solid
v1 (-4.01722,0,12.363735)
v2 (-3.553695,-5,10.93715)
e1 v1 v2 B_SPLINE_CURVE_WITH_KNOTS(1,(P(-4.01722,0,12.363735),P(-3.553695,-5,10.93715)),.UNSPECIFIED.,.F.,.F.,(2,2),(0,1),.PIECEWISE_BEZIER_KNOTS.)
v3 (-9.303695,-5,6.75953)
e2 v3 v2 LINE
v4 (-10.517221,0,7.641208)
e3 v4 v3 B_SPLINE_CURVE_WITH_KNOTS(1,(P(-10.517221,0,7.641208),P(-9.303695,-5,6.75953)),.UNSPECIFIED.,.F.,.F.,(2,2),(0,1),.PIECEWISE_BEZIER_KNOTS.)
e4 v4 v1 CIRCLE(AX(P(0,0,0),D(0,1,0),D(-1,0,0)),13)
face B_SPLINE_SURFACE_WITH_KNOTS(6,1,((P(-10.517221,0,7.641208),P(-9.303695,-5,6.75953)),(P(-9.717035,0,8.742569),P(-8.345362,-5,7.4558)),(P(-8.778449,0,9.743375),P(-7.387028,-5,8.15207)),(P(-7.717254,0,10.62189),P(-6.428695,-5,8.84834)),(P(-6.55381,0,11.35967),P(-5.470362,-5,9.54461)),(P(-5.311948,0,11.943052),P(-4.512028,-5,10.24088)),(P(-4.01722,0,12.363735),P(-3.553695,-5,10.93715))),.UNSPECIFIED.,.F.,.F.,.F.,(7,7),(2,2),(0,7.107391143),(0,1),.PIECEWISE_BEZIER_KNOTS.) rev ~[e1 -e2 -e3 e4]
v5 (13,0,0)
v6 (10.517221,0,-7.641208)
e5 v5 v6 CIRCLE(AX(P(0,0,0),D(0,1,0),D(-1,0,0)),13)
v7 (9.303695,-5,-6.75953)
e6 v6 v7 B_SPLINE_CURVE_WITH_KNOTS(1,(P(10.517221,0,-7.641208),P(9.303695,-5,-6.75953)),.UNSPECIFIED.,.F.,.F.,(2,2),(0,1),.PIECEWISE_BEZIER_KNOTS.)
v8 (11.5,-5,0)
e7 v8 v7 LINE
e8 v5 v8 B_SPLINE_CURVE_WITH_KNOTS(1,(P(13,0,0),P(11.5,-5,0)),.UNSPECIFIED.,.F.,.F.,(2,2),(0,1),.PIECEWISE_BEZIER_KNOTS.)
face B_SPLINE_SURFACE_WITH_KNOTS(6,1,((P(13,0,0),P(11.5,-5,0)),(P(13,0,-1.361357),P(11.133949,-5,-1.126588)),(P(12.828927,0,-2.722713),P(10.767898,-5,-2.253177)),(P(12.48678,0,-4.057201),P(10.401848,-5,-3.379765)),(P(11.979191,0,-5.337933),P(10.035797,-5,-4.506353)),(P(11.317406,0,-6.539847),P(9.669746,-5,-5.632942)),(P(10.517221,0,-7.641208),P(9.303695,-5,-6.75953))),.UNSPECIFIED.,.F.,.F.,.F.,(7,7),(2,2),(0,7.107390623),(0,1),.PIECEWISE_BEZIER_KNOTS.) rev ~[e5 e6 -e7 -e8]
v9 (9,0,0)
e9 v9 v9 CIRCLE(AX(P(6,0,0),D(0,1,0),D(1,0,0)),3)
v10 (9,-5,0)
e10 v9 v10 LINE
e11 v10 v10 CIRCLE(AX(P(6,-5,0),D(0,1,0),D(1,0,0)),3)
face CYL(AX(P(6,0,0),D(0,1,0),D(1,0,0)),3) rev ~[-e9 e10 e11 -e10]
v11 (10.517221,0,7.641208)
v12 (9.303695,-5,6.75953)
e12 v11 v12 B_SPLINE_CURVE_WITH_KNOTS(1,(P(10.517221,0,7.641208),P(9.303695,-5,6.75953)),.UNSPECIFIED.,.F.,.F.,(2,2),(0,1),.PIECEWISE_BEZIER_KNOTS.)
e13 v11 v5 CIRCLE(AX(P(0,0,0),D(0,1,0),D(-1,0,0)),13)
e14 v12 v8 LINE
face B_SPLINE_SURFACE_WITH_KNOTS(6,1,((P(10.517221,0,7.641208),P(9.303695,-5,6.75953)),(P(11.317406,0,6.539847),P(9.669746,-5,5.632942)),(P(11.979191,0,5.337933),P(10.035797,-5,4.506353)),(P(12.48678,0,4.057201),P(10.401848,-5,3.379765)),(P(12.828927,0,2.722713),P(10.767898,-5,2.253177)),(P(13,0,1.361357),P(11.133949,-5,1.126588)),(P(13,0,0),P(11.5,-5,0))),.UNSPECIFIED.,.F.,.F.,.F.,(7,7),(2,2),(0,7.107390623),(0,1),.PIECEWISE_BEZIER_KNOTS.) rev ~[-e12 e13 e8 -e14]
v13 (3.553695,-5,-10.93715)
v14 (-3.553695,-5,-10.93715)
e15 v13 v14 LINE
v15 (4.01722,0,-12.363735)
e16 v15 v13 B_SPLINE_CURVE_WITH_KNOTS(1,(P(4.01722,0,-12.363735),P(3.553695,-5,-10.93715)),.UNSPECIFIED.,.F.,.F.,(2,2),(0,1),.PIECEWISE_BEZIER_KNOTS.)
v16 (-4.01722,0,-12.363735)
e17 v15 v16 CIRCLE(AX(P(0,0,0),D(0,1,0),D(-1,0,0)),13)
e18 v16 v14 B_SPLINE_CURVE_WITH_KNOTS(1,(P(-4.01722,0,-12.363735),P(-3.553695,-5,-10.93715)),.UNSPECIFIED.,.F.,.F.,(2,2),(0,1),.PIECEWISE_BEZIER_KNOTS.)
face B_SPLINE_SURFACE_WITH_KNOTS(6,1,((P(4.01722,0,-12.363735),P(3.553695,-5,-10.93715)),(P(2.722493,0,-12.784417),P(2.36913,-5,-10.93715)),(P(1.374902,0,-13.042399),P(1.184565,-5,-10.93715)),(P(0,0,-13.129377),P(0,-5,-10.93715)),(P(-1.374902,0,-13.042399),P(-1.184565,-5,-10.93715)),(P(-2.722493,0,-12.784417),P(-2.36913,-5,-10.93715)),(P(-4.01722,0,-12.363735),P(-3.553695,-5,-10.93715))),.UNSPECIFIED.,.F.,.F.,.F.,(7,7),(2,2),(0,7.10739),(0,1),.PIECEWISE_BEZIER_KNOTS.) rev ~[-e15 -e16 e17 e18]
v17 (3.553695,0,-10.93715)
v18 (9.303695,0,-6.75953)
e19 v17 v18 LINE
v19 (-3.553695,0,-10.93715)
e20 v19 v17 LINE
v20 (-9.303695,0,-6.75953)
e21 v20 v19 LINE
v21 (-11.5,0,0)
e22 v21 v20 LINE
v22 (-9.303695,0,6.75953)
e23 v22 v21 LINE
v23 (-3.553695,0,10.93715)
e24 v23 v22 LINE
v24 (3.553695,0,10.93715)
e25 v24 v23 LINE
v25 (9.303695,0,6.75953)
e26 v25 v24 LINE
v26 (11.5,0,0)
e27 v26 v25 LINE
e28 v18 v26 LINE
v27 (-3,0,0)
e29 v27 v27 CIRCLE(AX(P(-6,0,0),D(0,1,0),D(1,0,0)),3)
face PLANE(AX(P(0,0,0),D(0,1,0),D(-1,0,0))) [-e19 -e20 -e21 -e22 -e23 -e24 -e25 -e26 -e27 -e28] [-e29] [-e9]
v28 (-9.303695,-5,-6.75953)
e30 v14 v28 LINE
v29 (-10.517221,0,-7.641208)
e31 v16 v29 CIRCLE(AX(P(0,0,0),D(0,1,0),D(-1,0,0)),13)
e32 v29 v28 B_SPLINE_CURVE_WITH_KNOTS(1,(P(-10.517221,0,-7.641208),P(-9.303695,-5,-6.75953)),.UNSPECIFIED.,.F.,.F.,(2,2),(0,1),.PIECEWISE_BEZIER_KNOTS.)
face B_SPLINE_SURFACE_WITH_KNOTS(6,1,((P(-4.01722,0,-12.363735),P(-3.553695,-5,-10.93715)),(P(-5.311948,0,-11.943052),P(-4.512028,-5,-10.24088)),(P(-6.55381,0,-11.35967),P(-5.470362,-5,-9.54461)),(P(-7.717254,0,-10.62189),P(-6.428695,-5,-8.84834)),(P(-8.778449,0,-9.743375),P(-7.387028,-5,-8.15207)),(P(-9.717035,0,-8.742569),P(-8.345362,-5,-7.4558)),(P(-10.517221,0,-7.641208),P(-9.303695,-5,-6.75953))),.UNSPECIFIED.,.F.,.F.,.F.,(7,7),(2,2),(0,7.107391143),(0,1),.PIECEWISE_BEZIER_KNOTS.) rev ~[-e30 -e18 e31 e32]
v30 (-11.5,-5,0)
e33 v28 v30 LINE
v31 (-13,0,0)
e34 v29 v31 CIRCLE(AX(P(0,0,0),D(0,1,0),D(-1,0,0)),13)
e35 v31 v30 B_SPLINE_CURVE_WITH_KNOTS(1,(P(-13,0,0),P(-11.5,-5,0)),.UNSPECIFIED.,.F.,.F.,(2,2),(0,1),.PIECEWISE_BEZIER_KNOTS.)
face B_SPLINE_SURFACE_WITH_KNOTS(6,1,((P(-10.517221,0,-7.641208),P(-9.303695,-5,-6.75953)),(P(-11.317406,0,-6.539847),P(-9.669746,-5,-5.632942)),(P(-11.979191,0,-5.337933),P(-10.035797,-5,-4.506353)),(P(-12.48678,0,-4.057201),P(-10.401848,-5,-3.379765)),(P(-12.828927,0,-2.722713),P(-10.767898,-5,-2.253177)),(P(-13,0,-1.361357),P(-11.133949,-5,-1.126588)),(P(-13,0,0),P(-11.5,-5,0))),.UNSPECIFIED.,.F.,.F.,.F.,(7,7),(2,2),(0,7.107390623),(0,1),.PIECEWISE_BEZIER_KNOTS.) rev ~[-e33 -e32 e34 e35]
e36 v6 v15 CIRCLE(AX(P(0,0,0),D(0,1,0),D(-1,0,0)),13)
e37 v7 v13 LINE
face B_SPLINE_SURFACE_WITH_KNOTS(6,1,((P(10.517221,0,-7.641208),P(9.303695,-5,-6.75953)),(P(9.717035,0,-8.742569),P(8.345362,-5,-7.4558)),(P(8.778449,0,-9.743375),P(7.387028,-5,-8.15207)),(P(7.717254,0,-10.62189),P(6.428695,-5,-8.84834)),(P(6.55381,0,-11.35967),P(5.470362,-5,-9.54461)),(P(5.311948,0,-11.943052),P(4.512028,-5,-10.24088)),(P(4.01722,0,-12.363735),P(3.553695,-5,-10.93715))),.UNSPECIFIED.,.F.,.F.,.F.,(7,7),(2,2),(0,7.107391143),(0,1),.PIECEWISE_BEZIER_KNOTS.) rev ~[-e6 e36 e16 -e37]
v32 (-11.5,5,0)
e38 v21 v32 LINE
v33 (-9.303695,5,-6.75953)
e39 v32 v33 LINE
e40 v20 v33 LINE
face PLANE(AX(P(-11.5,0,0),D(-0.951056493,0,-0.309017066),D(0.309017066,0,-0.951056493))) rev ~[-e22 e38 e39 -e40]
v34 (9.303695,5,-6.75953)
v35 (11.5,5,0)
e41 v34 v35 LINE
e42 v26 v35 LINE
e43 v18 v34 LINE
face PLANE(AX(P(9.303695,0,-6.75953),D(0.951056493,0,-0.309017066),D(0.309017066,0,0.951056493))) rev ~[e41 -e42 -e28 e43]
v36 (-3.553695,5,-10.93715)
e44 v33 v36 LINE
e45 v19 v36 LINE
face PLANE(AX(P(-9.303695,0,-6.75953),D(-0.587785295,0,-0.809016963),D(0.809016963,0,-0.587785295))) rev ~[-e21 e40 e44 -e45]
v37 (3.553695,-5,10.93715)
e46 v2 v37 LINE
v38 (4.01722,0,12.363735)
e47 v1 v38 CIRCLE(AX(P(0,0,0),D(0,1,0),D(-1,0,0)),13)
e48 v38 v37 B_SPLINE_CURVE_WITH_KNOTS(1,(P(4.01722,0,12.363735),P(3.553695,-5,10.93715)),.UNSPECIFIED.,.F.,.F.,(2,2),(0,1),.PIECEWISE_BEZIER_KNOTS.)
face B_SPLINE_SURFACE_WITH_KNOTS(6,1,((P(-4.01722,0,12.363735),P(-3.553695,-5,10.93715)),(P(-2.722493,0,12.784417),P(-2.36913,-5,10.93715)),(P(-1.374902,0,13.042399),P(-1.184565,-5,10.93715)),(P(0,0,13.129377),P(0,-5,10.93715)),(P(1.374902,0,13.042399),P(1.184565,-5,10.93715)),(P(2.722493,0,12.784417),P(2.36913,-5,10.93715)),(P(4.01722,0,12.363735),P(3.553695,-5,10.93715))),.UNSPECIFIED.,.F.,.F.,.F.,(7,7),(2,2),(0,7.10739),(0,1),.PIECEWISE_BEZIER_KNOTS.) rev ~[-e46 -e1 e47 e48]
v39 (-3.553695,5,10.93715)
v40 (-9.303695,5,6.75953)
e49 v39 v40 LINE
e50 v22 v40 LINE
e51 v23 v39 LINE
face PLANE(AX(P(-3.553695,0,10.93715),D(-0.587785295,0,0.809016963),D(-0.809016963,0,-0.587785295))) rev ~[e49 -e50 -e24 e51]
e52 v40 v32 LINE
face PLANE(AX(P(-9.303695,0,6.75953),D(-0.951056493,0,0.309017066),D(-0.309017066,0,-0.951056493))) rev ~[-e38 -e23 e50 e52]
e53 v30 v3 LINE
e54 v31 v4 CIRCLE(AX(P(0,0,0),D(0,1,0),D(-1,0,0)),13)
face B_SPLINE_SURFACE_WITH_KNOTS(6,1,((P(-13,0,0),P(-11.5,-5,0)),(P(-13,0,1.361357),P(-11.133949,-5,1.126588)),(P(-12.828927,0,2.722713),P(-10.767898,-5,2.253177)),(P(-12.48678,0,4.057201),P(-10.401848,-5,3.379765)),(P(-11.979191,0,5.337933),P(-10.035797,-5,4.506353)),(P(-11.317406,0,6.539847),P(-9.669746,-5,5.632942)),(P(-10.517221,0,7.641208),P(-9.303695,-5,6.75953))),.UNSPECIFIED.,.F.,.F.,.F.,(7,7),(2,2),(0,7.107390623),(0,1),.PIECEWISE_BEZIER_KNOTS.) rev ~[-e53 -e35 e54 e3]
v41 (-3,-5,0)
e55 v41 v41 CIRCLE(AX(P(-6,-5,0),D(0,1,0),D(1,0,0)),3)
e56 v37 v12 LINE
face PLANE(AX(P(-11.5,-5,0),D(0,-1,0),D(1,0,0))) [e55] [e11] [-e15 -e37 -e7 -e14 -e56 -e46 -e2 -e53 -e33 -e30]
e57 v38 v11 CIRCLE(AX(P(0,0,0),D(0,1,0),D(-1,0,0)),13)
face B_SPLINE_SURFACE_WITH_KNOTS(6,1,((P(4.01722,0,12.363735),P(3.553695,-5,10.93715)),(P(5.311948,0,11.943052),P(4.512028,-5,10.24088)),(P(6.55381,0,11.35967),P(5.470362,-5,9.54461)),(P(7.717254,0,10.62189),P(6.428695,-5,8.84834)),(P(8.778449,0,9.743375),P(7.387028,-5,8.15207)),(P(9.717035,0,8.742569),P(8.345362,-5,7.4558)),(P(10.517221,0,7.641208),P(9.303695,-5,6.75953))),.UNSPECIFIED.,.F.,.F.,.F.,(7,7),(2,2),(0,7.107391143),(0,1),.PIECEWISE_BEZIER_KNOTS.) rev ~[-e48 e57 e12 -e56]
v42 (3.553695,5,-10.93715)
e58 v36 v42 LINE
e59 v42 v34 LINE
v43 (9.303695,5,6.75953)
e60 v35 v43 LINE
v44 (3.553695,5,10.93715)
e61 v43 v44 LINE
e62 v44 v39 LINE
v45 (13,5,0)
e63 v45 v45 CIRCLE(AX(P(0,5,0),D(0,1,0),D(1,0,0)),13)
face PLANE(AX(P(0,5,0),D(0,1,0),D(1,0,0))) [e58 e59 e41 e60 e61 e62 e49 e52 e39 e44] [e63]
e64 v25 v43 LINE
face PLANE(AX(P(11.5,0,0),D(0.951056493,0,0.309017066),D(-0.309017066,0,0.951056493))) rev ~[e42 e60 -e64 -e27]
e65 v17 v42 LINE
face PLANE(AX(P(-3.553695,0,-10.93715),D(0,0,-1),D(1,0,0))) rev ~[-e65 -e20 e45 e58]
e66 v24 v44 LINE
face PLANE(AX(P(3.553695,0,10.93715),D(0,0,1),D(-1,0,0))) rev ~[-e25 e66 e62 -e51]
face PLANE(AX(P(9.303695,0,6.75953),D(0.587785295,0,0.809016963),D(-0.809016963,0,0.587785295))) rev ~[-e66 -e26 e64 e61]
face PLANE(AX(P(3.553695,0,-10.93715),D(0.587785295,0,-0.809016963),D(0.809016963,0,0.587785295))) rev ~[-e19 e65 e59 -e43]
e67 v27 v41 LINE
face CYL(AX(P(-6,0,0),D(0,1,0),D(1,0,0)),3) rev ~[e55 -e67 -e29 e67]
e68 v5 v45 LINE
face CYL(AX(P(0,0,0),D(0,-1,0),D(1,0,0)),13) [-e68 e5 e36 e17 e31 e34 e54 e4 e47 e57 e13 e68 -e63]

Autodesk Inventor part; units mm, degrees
ref_plane "YZ Plane" through (0, 0, 0) normal (1, 0, 0) x (0, 1, 0)
ref_plane "XZ Plane" through (0, 0, 0) normal (0, 1, 0) x (-1, 0, 0)
ref_plane "XY Plane" through (0, 0, 0) normal (0, 0, 1) x (1, 0, 0)
sketch "Sketch1" plane through (0, 0, 0) normal (0, 1, 0) x (-1, 0, 0)
  circle A0 centre (0, 0) radius 13
  line L0 (-11.5, 0) -> (-9.303695, 6.75953) construction
  line L1 (-9.303695, 6.75953) -> (-3.553695, 10.93715) construction
  line L2 (-3.553695, 10.93715) -> (3.553695, 10.93715) construction
  line L3 (3.553695, 10.93715) -> (9.303695, 6.75953) construction
  line L4 (9.303695, 6.75953) -> (11.5, 0) construction
  line L5 (11.5, 0) -> (9.303695, -6.75953) construction
  line L6 (9.303695, -6.75953) -> (3.553695, -10.93715) construction
  line L7 (3.553695, -10.93715) -> (-3.553695, -10.93715) construction
  line L8 (-3.553695, -10.93715) -> (-9.303695, -6.75953) construction
  line L9 (-9.303695, -6.75953) -> (-11.5, 0) construction
  circle A1 centre (-6, 0) radius 3 construction
  circle A2 centre (6, 0) radius 3 construction
  line L10 (13, 0) -> (10.517221, -7.641208) construction
  line L11 (10.517221, -7.641208) -> (4.017221, -12.363735) construction
  line L12 (4.017221, -12.363735) -> (-4.017221, -12.363735) construction
  line L13 (-4.017221, -12.363735) -> (-10.517221, -7.641208) construction
  line L14 (-10.517221, -7.641208) -> (-13, 0) construction
  line L15 (-13, 0) -> (-10.517221, 7.641208) construction
  line L16 (-10.517221, 7.641208) -> (-4.017221, 12.363735) construction
  line L17 (-4.017221, 12.363735) -> (4.017221, 12.363735) construction
  line L18 (4.017221, 12.363735) -> (10.517221, 7.641208) construction
  line L19 (10.517221, 7.641208) -> (13, 0) construction
  dimension "d0" = 26
  dimension "d10" = 6
  dimension "d11" = 6
ref_plane "Work Plane1" through (0, -5, 0) normal (0, -1, 0) x (1, 0, 0)
sketch "Sketch2" plane through (0, -5, 0) normal (0, -1, 0) x (1, 0, 0)
  circle A0 centre (0, 0) radius 13 construction
  line L0 (-9.303695, 6.75953) -> (-11.5, 0)
  line L1 (-11.5, 0) -> (-9.303695, 6.75953)
  line L2 (-9.303695, 6.75953) -> (-3.553695, 10.93715)
  line L3 (-3.553695, 10.93715) -> (3.553695, 10.93715)
  line L4 (3.553695, 10.93715) -> (9.303695, 6.75953)
  line L5 (9.303695, 6.75953) -> (11.5, 0)
  line L6 (11.5, 0) -> (9.303695, -6.75953)
  line L7 (9.303695, -6.75953) -> (3.553695, -10.93715)
  line L8 (3.553695, -10.93715) -> (-3.553695, -10.93715)
  line L9 (-3.553695, -10.93715) -> (-9.303695, -6.75953)
  line L10 (-9.303695, -6.75953) -> (-11.5, 0)
sketch3d "3D Sketch1"
sketch "Sketch1 outline for Loft1" plane through (0, 0, 0) normal (0, 1, 0) x (-1, 0, 0)
  circle A0 centre (0, 0) radius 13
sketch "Sketch2 outline for Loft1" plane through (0, -5, 0) normal (0, -1, 0) x (1, 0, 0)
  line L0 (-11.5, 0) -> (-9.303695, 6.75953)
  line L1 (-9.303695, 6.75953) -> (-3.553695, 10.93715)
  line L2 (-3.553695, 10.93715) -> (3.553695, 10.93715)
  line L3 (3.553695, 10.93715) -> (9.303695, 6.75953)
  line L4 (9.303695, 6.75953) -> (11.5, 0)
  line L5 (11.5, 0) -> (9.303695, -6.75953)
  line L6 (9.303695, -6.75953) -> (3.553695, -10.93715)
  line L7 (3.553695, -10.93715) -> (-3.553695, -10.93715)
  line L8 (-3.553695, -10.93715) -> (-9.303695, -6.75953)
  line L9 (-9.303695, -6.75953) -> (-11.5, 0)
loft "Loft1" add profiles "Sketch1 outline for Loft1", "Sketch2 outline for Loft1"
sketch "Sketch3" plane through (0, 0, 0) normal (0, 1, 0) x (1, 0, 0)
  circle A0 centre (0, 0) radius 13
  line L0 (-11.5, 0) -> (-9.303695, 6.75953)
  line L1 (-9.303695, 6.75953) -> (-3.553695, 10.93715)
  line L2 (-3.553695, 10.93715) -> (3.553695, 10.93715)
  line L3 (3.553695, 10.93715) -> (9.303695, 6.75953)
  line L4 (9.303695, 6.75953) -> (11.5, 0)
  line L5 (11.5, 0) -> (9.303695, -6.75953)
  line L6 (9.303695, -6.75953) -> (3.553695, -10.93715)
  line L7 (3.553695, -10.93715) -> (-3.553695, -10.93715)
  line L8 (-3.553695, -10.93715) -> (-9.303695, -6.75953)
  line L9 (-9.303695, -6.75953) -> (-11.5, 0)
  circle A1 centre (0, 0) radius 13
  line L10 (-11.5, 0) -> (-9.303695, 6.75953)
  line L11 (-9.303695, 6.75953) -> (-3.553695, 10.93715)
  line L12 (-3.553695, 10.93715) -> (3.553695, 10.93715)
  line L13 (3.553695, 10.93715) -> (9.303695, 6.75953)
  line L14 (9.303695, 6.75953) -> (11.5, 0)
  line L15 (11.5, 0) -> (9.303695, -6.75953)
  line L16 (9.303695, -6.75953) -> (3.553695, -10.93715)
  line L17 (3.553695, -10.93715) -> (-3.553695, -10.93715)
  line L18 (-3.553695, -10.93715) -> (-9.303695, -6.75953)
  line L19 (-9.303695, -6.75953) -> (-11.5, 0)
  circle A2 centre (-6, 0) radius 3
  circle A3 centre (6, 0) radius 3
  dimension "d28" = 11.5
  dimension "d29" = 26
  dimension "d30" = 6
  dimension "d31" = 6
extrude "Extrusion4" cut sketch "Sketch3" against normal blind 5 contours A3
extrude "Extrusion5" cut sketch "Sketch3" against normal blind 5 contours A2
extrude "Extrusion6" add sketch "Sketch3" along normal blind 5 contours A0
properties part number "Probe P1.5"
